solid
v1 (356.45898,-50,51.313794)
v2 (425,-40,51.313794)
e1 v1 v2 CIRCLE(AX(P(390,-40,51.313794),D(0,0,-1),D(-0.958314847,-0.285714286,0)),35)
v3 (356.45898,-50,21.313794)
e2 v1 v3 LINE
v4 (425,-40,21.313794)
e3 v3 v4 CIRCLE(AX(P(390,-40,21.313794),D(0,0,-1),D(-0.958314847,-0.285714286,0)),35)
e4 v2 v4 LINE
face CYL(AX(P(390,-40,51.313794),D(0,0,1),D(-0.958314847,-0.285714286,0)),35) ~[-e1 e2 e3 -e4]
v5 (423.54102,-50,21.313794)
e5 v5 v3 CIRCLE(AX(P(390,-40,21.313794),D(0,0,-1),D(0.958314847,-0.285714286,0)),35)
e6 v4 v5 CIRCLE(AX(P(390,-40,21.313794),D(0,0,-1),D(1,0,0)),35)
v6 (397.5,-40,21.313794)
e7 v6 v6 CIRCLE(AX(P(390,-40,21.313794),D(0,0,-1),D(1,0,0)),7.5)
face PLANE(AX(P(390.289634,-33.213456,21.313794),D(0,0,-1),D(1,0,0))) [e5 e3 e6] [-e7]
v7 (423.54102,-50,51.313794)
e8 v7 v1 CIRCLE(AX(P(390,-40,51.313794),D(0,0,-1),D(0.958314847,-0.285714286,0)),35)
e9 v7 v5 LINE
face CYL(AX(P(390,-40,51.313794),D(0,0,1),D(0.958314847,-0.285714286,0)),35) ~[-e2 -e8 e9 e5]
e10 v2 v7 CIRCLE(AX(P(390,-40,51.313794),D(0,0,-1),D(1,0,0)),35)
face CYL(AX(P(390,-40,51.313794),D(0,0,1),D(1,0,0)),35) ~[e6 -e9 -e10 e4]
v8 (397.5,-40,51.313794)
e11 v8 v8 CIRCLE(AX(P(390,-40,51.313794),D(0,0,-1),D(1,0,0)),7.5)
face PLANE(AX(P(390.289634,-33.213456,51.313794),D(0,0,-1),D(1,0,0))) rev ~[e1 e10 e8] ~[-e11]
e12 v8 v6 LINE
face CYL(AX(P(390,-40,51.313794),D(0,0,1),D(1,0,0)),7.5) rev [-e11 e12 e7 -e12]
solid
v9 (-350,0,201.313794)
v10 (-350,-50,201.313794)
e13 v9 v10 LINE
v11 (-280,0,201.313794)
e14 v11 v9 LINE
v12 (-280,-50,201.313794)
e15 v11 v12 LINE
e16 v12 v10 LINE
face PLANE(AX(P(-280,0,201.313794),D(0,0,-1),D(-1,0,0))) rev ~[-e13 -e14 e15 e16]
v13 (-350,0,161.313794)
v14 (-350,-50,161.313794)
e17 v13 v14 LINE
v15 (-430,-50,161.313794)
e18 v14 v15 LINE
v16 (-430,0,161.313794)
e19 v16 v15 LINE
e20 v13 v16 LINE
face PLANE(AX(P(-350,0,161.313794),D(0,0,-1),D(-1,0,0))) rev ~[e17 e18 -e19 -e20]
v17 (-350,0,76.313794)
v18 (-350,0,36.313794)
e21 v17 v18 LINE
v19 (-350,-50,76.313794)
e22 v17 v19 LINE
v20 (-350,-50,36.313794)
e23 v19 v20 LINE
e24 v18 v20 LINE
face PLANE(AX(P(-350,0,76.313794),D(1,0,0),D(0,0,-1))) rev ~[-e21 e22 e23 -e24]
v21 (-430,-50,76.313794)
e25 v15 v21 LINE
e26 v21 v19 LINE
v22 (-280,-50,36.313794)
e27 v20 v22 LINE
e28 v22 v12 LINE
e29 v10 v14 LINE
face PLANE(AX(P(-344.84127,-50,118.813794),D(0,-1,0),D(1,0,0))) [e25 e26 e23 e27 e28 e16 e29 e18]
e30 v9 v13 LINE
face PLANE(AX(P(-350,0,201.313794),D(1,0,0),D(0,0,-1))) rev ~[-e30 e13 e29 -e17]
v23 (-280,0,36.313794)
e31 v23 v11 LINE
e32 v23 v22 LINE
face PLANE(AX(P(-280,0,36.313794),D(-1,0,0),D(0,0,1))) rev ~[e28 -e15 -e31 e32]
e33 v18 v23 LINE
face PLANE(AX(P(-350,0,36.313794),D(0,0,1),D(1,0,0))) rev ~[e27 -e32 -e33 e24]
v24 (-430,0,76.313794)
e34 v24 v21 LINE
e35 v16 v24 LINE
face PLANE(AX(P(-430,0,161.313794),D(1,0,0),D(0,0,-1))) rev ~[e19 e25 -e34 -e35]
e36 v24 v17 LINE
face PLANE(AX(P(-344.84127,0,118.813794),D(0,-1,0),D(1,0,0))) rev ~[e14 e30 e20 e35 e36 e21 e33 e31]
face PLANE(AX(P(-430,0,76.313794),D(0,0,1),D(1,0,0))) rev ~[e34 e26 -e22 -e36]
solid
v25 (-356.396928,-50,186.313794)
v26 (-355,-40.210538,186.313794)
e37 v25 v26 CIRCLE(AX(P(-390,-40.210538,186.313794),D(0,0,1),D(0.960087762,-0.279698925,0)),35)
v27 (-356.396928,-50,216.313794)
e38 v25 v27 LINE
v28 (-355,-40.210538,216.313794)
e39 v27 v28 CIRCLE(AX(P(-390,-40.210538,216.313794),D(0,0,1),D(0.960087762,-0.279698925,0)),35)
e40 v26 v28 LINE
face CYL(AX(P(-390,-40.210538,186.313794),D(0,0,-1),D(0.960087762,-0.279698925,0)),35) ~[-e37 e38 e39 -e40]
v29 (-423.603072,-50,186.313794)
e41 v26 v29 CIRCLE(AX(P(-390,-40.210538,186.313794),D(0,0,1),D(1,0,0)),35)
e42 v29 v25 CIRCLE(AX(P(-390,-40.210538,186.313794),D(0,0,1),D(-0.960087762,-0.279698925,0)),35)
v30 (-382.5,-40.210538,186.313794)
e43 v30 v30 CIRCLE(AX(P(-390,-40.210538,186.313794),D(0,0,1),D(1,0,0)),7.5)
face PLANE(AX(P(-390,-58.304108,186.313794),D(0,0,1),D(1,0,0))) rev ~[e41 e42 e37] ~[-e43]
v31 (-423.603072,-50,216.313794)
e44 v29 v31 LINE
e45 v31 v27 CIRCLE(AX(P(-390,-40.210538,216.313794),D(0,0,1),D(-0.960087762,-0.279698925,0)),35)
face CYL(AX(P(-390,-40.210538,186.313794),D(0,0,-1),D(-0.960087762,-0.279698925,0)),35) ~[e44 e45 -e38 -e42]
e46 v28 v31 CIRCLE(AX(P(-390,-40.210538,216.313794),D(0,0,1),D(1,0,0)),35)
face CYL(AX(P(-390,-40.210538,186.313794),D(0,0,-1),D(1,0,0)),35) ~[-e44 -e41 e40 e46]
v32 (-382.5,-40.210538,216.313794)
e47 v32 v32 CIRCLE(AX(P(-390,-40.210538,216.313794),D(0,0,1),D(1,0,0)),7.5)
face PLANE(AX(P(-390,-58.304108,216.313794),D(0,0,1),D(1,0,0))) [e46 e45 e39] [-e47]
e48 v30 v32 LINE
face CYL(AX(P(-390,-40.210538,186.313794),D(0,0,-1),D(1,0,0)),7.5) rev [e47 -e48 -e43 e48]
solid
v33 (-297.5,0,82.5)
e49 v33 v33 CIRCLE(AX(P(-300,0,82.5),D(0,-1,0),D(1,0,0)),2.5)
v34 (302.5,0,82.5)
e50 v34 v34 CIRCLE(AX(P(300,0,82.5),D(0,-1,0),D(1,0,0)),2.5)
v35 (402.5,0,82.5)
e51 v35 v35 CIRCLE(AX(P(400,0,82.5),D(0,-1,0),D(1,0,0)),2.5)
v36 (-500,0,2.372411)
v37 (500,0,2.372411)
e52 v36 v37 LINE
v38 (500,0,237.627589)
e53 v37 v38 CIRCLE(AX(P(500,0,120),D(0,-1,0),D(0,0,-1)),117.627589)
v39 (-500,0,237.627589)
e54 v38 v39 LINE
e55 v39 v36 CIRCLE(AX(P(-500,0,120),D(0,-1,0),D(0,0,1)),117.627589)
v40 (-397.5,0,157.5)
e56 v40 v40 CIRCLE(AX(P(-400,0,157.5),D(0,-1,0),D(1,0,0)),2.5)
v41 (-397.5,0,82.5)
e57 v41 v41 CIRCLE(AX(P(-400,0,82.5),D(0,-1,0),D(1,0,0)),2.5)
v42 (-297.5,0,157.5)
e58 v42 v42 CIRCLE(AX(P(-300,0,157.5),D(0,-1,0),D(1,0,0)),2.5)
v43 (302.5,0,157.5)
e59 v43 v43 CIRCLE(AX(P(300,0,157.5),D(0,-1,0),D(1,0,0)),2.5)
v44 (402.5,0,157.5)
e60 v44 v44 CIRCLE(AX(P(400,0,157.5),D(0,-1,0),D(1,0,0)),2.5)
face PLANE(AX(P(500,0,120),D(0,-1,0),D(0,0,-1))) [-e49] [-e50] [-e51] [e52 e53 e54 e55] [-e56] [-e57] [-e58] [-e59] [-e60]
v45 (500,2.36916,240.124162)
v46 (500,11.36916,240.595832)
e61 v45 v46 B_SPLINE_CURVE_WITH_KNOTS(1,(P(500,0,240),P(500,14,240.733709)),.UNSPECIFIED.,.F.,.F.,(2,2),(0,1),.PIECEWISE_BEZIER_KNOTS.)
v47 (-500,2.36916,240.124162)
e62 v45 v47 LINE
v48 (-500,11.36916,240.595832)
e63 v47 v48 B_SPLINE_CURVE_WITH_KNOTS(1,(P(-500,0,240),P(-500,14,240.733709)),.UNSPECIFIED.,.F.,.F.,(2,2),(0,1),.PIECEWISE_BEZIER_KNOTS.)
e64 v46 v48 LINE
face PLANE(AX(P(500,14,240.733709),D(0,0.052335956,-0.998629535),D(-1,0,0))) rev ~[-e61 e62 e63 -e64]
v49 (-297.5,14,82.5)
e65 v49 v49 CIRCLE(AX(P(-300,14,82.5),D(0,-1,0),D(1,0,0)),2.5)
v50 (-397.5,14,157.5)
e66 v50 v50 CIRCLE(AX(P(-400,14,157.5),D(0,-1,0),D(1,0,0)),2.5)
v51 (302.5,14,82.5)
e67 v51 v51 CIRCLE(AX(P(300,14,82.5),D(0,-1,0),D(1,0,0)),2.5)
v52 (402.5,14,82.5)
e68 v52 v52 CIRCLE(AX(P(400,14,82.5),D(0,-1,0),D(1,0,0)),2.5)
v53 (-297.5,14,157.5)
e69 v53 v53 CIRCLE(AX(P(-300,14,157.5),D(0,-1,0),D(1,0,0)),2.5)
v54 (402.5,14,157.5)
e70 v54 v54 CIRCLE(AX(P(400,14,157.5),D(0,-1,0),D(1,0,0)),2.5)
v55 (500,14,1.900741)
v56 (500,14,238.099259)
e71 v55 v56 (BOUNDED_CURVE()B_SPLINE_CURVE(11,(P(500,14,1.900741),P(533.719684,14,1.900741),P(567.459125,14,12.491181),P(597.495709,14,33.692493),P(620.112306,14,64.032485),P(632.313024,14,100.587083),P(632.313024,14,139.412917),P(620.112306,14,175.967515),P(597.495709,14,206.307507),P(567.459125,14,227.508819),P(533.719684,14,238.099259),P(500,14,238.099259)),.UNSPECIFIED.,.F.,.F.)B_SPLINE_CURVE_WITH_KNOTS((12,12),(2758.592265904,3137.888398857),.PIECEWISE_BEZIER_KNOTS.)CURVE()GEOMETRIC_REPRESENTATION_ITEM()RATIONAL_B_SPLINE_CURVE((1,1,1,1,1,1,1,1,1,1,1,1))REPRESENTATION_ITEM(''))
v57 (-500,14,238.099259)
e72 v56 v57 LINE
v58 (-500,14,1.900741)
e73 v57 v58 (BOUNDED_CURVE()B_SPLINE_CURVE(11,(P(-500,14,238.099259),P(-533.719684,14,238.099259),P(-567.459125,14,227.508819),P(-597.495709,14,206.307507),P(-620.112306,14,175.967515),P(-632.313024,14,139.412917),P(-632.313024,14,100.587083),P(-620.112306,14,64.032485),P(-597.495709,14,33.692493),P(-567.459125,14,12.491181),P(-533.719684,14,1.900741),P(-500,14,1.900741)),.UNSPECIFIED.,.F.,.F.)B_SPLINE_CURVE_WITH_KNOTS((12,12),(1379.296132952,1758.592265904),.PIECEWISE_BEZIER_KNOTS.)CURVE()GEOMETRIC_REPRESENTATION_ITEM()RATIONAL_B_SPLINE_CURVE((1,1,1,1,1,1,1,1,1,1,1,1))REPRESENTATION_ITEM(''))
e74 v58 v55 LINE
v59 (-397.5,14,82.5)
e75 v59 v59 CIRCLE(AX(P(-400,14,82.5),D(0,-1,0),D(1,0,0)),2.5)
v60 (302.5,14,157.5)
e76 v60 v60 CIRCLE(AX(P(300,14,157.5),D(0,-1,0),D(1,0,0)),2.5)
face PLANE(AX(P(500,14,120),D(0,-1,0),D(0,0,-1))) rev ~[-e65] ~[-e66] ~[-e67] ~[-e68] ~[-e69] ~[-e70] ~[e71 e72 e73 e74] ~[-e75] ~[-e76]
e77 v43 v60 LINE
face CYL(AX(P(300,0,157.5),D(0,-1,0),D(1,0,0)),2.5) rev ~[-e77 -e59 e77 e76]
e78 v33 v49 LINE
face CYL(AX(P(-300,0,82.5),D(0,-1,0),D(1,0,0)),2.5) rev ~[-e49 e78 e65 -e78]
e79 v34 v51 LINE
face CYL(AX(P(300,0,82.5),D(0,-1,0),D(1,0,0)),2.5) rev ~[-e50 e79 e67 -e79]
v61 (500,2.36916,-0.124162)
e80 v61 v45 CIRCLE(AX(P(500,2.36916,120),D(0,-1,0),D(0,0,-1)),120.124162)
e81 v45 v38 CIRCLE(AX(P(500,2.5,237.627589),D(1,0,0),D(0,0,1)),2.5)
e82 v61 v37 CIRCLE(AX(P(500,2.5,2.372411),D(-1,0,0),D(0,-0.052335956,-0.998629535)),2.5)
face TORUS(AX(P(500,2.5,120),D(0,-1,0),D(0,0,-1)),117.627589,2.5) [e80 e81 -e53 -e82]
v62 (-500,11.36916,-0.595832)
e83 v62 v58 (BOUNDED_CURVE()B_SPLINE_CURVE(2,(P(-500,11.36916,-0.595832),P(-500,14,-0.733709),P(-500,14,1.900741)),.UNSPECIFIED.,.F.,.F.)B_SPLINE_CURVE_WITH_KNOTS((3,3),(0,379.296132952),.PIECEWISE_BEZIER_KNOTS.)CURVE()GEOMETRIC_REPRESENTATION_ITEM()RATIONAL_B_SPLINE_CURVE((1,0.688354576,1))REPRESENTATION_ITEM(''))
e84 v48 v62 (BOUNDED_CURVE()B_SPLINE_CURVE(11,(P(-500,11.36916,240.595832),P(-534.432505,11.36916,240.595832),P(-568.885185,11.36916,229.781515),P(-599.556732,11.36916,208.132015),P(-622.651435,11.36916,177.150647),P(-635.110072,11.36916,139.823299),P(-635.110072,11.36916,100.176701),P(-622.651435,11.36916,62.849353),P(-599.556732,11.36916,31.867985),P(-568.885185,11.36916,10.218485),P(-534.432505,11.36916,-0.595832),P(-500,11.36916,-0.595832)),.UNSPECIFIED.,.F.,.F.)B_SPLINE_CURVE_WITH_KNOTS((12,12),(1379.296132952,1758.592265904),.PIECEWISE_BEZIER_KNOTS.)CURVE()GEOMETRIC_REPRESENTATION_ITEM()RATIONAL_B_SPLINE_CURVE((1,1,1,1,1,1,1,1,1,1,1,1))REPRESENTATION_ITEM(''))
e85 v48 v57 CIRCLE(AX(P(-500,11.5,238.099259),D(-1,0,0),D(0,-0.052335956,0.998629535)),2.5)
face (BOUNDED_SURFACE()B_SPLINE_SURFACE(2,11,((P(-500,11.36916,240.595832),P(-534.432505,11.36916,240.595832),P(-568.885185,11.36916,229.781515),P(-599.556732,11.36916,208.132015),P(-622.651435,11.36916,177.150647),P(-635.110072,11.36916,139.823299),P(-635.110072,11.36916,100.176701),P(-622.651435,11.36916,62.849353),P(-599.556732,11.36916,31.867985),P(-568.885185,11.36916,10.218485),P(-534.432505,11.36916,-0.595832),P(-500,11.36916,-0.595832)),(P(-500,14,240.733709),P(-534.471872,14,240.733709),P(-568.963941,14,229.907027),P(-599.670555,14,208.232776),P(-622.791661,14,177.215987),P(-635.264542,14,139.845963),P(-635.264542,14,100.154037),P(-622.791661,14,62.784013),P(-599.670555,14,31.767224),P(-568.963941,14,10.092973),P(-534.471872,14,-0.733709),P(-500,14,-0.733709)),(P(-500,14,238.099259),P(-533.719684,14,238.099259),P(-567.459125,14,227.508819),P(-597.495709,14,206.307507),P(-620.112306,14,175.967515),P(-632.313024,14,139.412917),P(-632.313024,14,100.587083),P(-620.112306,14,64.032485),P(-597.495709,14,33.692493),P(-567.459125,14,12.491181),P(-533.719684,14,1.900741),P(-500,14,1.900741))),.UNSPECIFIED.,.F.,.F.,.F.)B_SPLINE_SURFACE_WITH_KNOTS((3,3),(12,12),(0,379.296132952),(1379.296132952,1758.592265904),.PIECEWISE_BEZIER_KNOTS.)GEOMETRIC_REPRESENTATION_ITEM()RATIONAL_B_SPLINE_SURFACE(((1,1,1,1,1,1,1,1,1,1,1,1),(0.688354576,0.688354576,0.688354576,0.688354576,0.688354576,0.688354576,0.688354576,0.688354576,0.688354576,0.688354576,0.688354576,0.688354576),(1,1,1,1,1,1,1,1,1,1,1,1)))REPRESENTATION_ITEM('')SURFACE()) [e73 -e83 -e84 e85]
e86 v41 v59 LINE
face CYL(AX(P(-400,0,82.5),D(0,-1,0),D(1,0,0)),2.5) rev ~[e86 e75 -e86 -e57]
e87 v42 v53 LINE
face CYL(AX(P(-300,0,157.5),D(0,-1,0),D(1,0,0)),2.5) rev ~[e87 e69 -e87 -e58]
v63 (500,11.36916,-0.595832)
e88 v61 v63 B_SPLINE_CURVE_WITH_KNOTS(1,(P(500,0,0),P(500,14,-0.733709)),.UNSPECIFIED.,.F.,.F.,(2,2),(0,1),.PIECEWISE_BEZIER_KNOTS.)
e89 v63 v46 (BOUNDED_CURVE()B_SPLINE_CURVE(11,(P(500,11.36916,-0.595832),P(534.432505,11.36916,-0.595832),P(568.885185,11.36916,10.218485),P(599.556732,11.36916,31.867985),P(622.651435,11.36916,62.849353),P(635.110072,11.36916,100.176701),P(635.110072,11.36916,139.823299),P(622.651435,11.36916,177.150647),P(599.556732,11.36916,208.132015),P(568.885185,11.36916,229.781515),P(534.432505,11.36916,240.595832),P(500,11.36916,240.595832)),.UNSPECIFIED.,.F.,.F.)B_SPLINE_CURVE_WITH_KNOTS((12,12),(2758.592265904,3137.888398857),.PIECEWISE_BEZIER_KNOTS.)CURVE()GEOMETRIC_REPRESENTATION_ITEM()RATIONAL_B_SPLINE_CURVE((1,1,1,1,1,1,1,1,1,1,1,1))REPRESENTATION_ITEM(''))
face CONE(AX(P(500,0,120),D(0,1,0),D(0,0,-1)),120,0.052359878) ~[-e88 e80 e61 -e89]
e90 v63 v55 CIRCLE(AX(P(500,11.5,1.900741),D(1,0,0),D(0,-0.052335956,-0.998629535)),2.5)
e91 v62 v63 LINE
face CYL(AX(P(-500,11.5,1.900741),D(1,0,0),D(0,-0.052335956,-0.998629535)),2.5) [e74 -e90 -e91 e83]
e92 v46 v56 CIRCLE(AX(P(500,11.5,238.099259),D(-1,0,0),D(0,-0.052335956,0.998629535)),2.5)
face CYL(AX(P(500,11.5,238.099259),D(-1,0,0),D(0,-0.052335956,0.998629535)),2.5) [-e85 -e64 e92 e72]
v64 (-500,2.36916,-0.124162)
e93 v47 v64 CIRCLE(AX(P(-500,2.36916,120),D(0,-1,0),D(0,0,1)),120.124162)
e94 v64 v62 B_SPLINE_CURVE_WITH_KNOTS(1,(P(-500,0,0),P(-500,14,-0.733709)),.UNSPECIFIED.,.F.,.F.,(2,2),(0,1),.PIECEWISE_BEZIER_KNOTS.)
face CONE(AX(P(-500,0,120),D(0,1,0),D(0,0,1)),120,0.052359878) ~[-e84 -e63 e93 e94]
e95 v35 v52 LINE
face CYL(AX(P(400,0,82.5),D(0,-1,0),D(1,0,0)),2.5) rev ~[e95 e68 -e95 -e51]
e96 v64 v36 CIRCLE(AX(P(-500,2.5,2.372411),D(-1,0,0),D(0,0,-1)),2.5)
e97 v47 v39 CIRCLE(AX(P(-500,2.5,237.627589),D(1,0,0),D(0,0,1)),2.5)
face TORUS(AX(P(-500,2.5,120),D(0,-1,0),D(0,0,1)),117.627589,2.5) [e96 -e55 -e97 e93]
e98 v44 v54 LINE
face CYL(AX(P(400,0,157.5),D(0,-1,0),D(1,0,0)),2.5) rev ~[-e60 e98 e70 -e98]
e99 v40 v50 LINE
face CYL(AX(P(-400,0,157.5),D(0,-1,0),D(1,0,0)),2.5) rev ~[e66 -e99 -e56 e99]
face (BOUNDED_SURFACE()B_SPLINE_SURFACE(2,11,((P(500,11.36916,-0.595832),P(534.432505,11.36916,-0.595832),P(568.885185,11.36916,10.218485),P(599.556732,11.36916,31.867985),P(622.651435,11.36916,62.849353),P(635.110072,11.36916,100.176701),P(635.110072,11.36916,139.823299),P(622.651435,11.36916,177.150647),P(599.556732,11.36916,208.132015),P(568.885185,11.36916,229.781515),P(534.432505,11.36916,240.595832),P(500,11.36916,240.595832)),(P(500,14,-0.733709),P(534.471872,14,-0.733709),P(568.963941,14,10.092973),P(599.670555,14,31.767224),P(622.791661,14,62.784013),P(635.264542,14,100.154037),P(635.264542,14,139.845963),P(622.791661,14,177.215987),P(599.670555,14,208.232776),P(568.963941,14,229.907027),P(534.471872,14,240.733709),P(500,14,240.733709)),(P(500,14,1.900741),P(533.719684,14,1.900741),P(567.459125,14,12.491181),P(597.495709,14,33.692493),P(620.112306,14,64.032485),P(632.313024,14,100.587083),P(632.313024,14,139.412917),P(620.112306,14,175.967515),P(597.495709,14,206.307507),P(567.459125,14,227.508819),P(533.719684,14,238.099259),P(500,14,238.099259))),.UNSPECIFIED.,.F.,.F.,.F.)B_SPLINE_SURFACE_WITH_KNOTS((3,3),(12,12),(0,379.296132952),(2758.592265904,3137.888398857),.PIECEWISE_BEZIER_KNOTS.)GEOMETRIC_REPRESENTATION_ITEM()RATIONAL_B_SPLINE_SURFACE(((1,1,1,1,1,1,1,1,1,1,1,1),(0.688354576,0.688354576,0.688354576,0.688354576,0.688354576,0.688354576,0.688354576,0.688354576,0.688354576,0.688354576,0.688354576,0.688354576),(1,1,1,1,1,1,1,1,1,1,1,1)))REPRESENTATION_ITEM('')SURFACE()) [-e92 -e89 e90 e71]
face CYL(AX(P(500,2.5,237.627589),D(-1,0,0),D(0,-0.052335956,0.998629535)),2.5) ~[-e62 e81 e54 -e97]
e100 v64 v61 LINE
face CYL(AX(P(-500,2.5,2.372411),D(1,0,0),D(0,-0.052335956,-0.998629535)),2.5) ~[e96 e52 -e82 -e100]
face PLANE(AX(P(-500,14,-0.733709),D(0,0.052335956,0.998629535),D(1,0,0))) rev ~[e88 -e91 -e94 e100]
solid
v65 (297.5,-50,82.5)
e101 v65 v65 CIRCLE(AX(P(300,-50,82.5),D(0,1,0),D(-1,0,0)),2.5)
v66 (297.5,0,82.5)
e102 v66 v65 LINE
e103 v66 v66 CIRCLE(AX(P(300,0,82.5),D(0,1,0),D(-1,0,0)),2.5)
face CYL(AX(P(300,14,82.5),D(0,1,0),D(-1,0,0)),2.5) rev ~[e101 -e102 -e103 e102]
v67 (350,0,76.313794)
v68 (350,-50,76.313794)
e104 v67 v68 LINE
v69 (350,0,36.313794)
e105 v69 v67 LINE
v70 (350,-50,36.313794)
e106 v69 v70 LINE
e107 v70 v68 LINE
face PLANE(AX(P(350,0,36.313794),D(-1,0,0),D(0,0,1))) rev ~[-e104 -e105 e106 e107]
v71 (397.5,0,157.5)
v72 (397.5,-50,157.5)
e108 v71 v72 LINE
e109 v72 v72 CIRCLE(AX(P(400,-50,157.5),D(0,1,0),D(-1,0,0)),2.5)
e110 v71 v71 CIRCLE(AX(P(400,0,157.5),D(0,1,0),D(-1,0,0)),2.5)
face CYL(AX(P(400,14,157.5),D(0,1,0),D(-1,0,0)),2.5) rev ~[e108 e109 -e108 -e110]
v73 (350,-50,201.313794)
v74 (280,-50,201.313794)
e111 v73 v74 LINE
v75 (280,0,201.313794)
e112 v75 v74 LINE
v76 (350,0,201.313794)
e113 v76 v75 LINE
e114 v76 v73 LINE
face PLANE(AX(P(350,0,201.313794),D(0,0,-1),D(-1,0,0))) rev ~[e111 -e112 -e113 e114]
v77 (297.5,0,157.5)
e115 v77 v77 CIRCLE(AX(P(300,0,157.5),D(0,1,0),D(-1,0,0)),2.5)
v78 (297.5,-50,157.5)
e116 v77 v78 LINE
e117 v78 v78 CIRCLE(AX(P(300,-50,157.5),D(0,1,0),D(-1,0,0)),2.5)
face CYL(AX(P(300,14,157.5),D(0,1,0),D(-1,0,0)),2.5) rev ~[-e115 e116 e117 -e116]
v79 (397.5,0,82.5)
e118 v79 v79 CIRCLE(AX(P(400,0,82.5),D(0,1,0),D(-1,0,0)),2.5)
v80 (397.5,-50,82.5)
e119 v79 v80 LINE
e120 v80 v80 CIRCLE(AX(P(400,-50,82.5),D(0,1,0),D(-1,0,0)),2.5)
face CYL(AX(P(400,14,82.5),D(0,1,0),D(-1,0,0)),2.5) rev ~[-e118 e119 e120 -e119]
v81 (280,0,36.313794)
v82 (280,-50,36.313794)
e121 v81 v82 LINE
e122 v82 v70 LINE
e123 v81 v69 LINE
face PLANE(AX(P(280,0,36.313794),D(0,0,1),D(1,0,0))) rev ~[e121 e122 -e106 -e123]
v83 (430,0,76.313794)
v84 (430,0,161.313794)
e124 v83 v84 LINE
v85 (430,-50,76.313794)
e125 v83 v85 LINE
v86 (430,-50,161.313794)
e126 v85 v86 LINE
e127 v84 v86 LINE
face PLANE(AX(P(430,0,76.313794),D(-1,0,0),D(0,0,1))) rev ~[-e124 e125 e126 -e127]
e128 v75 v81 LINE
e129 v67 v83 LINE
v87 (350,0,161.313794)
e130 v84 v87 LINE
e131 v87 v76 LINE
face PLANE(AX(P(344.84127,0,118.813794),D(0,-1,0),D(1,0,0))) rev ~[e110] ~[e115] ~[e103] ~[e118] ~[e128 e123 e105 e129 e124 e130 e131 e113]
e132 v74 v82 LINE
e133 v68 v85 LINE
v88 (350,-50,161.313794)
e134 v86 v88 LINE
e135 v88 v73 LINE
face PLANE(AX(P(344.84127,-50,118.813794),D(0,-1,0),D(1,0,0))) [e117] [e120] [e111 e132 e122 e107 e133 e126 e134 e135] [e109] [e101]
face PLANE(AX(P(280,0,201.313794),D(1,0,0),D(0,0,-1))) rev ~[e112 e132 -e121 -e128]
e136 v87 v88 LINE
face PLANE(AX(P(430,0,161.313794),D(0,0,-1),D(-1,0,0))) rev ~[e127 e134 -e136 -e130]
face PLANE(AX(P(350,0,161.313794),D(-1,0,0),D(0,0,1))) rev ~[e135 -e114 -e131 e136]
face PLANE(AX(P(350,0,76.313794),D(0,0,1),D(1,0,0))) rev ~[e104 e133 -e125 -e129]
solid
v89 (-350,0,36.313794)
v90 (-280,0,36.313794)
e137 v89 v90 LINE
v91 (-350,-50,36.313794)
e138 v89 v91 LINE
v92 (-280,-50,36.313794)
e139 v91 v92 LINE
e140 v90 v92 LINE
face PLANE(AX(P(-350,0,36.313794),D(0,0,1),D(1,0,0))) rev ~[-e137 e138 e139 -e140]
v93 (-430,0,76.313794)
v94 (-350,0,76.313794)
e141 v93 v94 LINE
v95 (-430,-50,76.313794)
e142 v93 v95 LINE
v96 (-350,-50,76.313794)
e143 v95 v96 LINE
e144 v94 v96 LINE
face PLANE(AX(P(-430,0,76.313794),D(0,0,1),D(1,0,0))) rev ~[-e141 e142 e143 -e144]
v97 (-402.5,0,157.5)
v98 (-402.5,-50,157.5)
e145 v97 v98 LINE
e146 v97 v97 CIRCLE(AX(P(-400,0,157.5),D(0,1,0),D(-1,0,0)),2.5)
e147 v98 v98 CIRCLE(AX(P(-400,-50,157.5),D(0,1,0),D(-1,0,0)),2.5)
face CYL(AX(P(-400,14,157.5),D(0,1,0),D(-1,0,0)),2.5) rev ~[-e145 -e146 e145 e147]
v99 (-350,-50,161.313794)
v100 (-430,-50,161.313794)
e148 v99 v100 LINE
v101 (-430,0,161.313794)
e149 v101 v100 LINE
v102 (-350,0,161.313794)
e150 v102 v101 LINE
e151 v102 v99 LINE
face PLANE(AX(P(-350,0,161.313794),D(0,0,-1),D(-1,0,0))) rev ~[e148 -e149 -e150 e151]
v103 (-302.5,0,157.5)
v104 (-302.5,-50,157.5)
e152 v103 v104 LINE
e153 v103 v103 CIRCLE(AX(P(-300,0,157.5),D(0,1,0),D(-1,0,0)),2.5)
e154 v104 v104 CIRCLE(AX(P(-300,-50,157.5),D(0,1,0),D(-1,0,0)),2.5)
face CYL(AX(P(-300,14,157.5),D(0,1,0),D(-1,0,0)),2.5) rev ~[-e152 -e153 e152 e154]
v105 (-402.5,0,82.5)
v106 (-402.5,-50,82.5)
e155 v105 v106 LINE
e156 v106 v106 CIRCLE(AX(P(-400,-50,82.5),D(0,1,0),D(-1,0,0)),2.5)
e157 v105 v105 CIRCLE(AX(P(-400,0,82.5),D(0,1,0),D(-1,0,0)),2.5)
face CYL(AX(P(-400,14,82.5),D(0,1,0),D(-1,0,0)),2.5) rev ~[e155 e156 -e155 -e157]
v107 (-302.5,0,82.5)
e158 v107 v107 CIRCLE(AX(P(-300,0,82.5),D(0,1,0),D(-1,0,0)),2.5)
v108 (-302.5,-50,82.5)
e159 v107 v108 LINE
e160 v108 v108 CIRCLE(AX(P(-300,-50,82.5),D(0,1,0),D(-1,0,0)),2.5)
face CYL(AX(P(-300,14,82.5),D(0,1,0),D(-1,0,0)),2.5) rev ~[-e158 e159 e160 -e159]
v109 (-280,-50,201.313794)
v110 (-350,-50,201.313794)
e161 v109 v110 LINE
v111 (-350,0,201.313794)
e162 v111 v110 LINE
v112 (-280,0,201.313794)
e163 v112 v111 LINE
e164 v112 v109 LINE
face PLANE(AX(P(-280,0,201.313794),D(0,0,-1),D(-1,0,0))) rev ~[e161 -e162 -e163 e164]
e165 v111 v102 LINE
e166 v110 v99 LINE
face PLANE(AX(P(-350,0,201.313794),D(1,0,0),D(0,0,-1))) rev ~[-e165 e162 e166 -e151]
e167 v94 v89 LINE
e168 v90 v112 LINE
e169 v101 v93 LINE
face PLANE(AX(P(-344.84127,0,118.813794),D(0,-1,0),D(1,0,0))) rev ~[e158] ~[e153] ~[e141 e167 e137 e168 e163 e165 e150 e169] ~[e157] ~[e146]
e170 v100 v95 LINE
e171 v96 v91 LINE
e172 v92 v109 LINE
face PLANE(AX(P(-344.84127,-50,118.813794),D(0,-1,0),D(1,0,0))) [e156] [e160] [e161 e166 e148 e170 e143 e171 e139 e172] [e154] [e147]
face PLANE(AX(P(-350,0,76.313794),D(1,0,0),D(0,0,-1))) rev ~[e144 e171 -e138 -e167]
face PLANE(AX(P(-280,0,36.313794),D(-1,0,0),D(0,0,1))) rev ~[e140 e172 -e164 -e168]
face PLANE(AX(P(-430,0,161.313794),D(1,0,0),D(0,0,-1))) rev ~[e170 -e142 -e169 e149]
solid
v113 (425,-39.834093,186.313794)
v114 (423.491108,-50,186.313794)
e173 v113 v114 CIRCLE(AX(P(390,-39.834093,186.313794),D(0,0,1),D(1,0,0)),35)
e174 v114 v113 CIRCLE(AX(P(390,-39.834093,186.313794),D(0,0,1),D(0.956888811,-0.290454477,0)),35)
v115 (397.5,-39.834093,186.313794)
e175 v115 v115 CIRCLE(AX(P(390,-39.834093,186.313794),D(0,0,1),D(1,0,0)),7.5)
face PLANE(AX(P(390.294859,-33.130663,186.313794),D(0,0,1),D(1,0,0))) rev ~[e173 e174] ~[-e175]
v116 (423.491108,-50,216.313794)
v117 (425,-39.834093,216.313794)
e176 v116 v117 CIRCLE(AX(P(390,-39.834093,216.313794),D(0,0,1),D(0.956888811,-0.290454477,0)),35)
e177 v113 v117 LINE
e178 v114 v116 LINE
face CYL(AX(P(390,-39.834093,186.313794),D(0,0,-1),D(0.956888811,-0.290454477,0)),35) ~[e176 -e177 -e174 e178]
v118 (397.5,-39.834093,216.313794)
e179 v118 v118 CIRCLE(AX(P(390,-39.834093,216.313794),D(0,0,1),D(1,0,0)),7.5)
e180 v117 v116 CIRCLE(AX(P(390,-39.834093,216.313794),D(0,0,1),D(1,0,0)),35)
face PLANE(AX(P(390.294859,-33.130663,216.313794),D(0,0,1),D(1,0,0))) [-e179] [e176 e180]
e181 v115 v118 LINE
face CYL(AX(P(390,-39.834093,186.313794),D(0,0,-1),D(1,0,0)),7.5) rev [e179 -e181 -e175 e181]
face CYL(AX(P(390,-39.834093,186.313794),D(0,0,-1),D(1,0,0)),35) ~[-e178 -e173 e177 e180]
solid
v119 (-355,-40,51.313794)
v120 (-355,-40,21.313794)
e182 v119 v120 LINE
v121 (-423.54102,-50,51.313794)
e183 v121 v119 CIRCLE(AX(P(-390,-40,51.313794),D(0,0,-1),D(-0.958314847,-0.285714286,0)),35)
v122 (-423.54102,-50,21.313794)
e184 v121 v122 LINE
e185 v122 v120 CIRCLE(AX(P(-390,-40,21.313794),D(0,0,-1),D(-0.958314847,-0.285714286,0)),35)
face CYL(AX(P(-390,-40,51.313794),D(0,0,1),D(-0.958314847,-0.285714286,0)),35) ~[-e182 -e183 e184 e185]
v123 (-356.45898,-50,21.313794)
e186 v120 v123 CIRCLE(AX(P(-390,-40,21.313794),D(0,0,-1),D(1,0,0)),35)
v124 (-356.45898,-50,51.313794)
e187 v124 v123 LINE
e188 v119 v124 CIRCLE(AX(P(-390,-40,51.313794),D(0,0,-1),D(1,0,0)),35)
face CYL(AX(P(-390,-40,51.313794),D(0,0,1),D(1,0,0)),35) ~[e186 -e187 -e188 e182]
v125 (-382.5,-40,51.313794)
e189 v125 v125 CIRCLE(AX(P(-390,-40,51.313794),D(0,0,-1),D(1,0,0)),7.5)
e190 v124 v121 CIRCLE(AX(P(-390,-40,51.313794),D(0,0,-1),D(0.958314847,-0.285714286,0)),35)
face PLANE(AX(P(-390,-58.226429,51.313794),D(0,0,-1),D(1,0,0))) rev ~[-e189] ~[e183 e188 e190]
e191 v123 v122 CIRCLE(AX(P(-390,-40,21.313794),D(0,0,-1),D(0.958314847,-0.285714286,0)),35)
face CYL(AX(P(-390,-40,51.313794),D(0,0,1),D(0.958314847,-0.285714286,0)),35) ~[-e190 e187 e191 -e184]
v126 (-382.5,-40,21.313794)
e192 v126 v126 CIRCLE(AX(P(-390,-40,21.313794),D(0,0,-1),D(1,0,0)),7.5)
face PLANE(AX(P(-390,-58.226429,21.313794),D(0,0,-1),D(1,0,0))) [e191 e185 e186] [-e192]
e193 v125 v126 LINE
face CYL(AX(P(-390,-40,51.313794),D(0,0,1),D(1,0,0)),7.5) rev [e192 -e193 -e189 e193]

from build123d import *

# Parameters (mm, degrees)
F1_DEPTH  = 14
F1_TAPER  = -3
F3_R      = 2.5
F4_R      = 2.5
F6_DEPTH  = 50
F7_DEPTH  = 50
F2_R      = 2.5
F8_DEPTH  = 14.0010001
F10_R     = 2.5
F11_DEPTH = 70
F22_START = 25
F21_R     = 7.5
F22_DEPTH = 30
F24_START = 25
F23_R     = 7.5
F24_DEPTH = 30
F26_START = 25
F25_R     = 7.5
F26_DEPTH = 30
F28_START = 25
F27_R     = 7.5
F28_DEPTH = 30


# Not quite as in the source:
# - the program builds the solid bodies; features that only make, move or delete a surface that nothing else refers to are left out


with BuildPart() as f1:
    # F0 (on Front) → F1 (new body)
    with BuildSketch(Plane.XZ):
        with BuildLine():
            Line((-500, 0), (0, 0))
            Line((0, 0), (500, 0))
            ThreePointArc((500, 0), (620, 120), (500, 240))
            Line((500, 240), (-500, 240))
            ThreePointArc((-500, 240), (-620, 120), (-500, 0))
        make_face()
    extrude(amount=-F1_DEPTH, taper=F1_TAPER)

    # F3
    f3_edges = [f1.edges().sort_by_distance(p)[0] for p in [
        (-620, 0, 120),
    ]]
    fillet(f3_edges, radius=F3_R)

    # F4
    f4_edges = [f1.edges().sort_by_distance(p)[0] for p in [
        (620.733709, 14, 120),
    ]]
    fillet(f4_edges, radius=F4_R)

    # F2 (on face) → F8 (cut, through all)
    with BuildSketch(Plane.XZ):
        with Locations((-400, 157.5)):
            Circle(F2_R)
        with Locations((-300, 157.5)):
            Circle(F2_R)
        with Locations((-400, 82.5)):
            Circle(F2_R)
        with Locations((-300, 82.5)):
            Circle(F2_R)
        with Locations((400, 82.5)):
            Circle(F2_R)
        with Locations((300, 82.5)):
            Circle(F2_R)
        with Locations((300, 157.5)):
            Circle(F2_R)
        with Locations((400, 157.5)):
            Circle(F2_R)
    extrude(amount=-F8_DEPTH, mode=Mode.SUBTRACT)


with BuildPart() as f6:
    # F5 (on Front) → F6 (new body)
    with BuildSketch(Plane.XZ):
        Polygon((-350, 161.3137942916), (-430, 161.3137942916), (-430, 76.3137942916), (-350, 76.3137942916), (-350, 36.3137942916), (-280, 36.3137942916), (-280, 76.3137942916), (-280, 161.3137942916), (-280, 201.3137942916), (-350, 201.3137942916), align=None)
    extrude(amount=F6_DEPTH)


with BuildPart() as f7:
    # F5 (on Front) → F7 (new body)
    with BuildSketch(Plane.XZ):
        Polygon((-350, 161.3137942916), (-430, 161.3137942916), (-430, 76.3137942916), (-350, 76.3137942916), (-350, 36.3137942916), (-280, 36.3137942916), (-280, 76.3137942916), (-280, 161.3137942916), (-280, 201.3137942916), (-350, 201.3137942916), align=None)
    extrude(amount=F7_DEPTH)


with BuildPart() as f7b:
    # F5 (on Front) → F7, piece 2 (new body)
    with BuildSketch(Plane.XZ):
        Polygon((350, 161.3137942916), (350, 201.3137942916), (280, 201.3137942916), (280, 161.3137942916), (280, 76.3137942916), (280, 36.3137942916), (350, 36.3137942916), (350, 76.3137942916), (430, 76.3137942916), (430, 161.3137942916), align=None)
    extrude(amount=F7_DEPTH)


with BuildPart() as f11:
    # F10 (on face) → F11 (new body)
    with BuildSketch(Plane(origin=(0, 14, 0), x_dir=(-1, 0, 0), z_dir=(0, 1, 0))):
        with Locations((400, 82.5)):
            Circle(F10_R)
    extrude(amount=-F11_DEPTH)


with BuildPart() as f11b:
    # F10 (on face) → F11, piece 2 (new body)
    with BuildSketch(Plane(origin=(0, 14, 0), x_dir=(-1, 0, 0), z_dir=(0, 1, 0))):
        with Locations((400, 157.5)):
            Circle(F10_R)
    extrude(amount=-F11_DEPTH)


with BuildPart() as f11c:
    # F10 (on face) → F11, piece 3 (new body)
    with BuildSketch(Plane(origin=(0, 14, 0), x_dir=(-1, 0, 0), z_dir=(0, 1, 0))):
        with Locations((300, 82.5)):
            Circle(F10_R)
    extrude(amount=-F11_DEPTH)


with BuildPart() as f11d:
    # F10 (on face) → F11, piece 4 (new body)
    with BuildSketch(Plane(origin=(0, 14, 0), x_dir=(-1, 0, 0), z_dir=(0, 1, 0))):
        with Locations((300, 157.5)):
            Circle(F10_R)
    extrude(amount=-F11_DEPTH)


with BuildPart() as f11e:
    # F10 (on face) → F11, piece 5 (new body)
    with BuildSketch(Plane(origin=(0, 14, 0), x_dir=(-1, 0, 0), z_dir=(0, 1, 0))):
        with Locations((-300, 82.5)):
            Circle(F10_R)
    extrude(amount=-F11_DEPTH)


with BuildPart() as f11f:
    # F10 (on face) → F11, piece 6 (new body)
    with BuildSketch(Plane(origin=(0, 14, 0), x_dir=(-1, 0, 0), z_dir=(0, 1, 0))):
        with Locations((-300, 157.5)):
            Circle(F10_R)
    extrude(amount=-F11_DEPTH)


with BuildPart() as f11g:
    # F10 (on face) → F11, piece 7 (new body)
    with BuildSketch(Plane(origin=(0, 14, 0), x_dir=(-1, 0, 0), z_dir=(0, 1, 0))):
        with Locations((-400, 82.5)):
            Circle(F10_R)
    extrude(amount=-F11_DEPTH)


with BuildPart() as f11h:
    # F10 (on face) → F11, piece 8 (new body)
    with BuildSketch(Plane(origin=(0, 14, 0), x_dir=(-1, 0, 0), z_dir=(0, 1, 0))):
        with Locations((-400, 157.5)):
            Circle(F10_R)
    extrude(amount=-F11_DEPTH)


with BuildPart() as f7b_1:
    add(f7b.part)

    # F12: cut F11d, F11c, F11, F11b, F11e, F11f, F11h, F11g
    add(f11d.part, mode=Mode.SUBTRACT)
    add(f11c.part, mode=Mode.SUBTRACT)
    add(f11.part, mode=Mode.SUBTRACT)
    add(f11b.part, mode=Mode.SUBTRACT)
    add(f11e.part, mode=Mode.SUBTRACT)
    add(f11f.part, mode=Mode.SUBTRACT)
    add(f11h.part, mode=Mode.SUBTRACT)
    add(f11g.part, mode=Mode.SUBTRACT)


with BuildPart() as f7_1:
    add(f7.part)

    # F12: cut F11d, F11c, F11, F11b, F11e, F11f, F11h, F11g
    add(f11d.part, mode=Mode.SUBTRACT)
    add(f11c.part, mode=Mode.SUBTRACT)
    add(f11.part, mode=Mode.SUBTRACT)
    add(f11b.part, mode=Mode.SUBTRACT)
    add(f11e.part, mode=Mode.SUBTRACT)
    add(f11f.part, mode=Mode.SUBTRACT)
    add(f11h.part, mode=Mode.SUBTRACT)
    add(f11g.part, mode=Mode.SUBTRACT)


with BuildPart() as f22:
    # F21 (on face) → F22 (new body)
    with BuildSketch(Plane.XY.offset(161.3137942916).offset(F22_START)):
        with BuildLine():
            ThreePointArc((423.4911083874, -50), (424.6207220719, -44.9727315677), (425, -39.8340933025))
            ThreePointArc((425, -39.8340933025), (384.8613617348, -5.2133712306), (356.5088916126, -50))
            Line((356.5088916126, -50), (423.4911083874, -50))
        make_face()
        with Locations((390, -39.8340933025)):
            Circle(F21_R, mode=Mode.SUBTRACT)
        with BuildLine():
            Line((423.4911083874, -50), (356.5088916126, -50))
            ThreePointArc((356.5088916126, -50), (390, -74.8340933025), (423.4911083874, -50))
        make_face()
    extrude(amount=F22_DEPTH)


with BuildPart() as f24:
    # F23 (on face) → F24 (new body)
    with BuildSketch(Plane(origin=(0, 0, 76.3137942916), x_dir=(1, 0, 0), z_dir=(0, 0, -1)).offset(F24_START)):
        with BuildLine():
            ThreePointArc((356.4589803375, 50), (384.9470646248, 5.3666657093), (425, 40))
            ThreePointArc((425, 40), (424.6333342907, 45.0529353752), (423.5410196625, 50))
            Line((423.5410196625, 50), (356.4589803375, 50))
        make_face()
        with Locations((390, 40)):
            Circle(F23_R, mode=Mode.SUBTRACT)
        with BuildLine():
            Line((356.4589803375, 50), (423.5410196625, 50))
            ThreePointArc((423.5410196625, 50), (390, 75), (356.4589803375, 50))
        make_face()
    extrude(amount=F24_DEPTH)


with BuildPart() as f26:
    # F25 (on face) → F26 (new body)
    with BuildSketch(Plane.XY.offset(161.3137942916).offset(F26_START)):
        with BuildLine():
            Line((-356.3969283225, -50), (-423.6030716775, -50))
            ThreePointArc((-423.6030716775, -50), (-390, -75.2105376124), (-356.3969283225, -50))
        make_face()
        with BuildLine():
            ThreePointArc((-356.3969283225, -50), (-355.3509920148, -45.1548520891), (-355, -40.2105376124))
            ThreePointArc((-355, -40.2105376124), (-394.9443144766, -5.5615296273), (-423.6030716775, -50))
            Line((-423.6030716775, -50), (-356.3969283225, -50))
        make_face()
        with Locations((-390, -40.2105376124)):
            Circle(F25_R, mode=Mode.SUBTRACT)
    extrude(amount=F26_DEPTH)


with BuildPart() as f28:
    # F27 (on face) → F28 (new body)
    with BuildSketch(Plane(origin=(0, 0, 76.3137942916), x_dir=(1, 0, 0), z_dir=(0, 0, -1)).offset(F28_START)):
        with BuildLine():
            Line((-423.5410196625, 50), (-356.4589803375, 50))
            ThreePointArc((-356.4589803375, 50), (-390, 75), (-423.5410196625, 50))
        make_face()
        with BuildLine():
            ThreePointArc((-423.5410196625, 50), (-395.0529353752, 5.3666657093), (-355, 40))
            ThreePointArc((-355, 40), (-355.3666657093, 45.0529353752), (-356.4589803375, 50))
            Line((-356.4589803375, 50), (-423.5410196625, 50))
        make_face()
        with Locations((-390, 40)):
            Circle(F27_R, mode=Mode.SUBTRACT)
    extrude(amount=F28_DEPTH)


solid = Compound([f1.part, f6.part, f7b_1.part, f7_1.part, f22.part, f24.part, f26.part, f28.part])
